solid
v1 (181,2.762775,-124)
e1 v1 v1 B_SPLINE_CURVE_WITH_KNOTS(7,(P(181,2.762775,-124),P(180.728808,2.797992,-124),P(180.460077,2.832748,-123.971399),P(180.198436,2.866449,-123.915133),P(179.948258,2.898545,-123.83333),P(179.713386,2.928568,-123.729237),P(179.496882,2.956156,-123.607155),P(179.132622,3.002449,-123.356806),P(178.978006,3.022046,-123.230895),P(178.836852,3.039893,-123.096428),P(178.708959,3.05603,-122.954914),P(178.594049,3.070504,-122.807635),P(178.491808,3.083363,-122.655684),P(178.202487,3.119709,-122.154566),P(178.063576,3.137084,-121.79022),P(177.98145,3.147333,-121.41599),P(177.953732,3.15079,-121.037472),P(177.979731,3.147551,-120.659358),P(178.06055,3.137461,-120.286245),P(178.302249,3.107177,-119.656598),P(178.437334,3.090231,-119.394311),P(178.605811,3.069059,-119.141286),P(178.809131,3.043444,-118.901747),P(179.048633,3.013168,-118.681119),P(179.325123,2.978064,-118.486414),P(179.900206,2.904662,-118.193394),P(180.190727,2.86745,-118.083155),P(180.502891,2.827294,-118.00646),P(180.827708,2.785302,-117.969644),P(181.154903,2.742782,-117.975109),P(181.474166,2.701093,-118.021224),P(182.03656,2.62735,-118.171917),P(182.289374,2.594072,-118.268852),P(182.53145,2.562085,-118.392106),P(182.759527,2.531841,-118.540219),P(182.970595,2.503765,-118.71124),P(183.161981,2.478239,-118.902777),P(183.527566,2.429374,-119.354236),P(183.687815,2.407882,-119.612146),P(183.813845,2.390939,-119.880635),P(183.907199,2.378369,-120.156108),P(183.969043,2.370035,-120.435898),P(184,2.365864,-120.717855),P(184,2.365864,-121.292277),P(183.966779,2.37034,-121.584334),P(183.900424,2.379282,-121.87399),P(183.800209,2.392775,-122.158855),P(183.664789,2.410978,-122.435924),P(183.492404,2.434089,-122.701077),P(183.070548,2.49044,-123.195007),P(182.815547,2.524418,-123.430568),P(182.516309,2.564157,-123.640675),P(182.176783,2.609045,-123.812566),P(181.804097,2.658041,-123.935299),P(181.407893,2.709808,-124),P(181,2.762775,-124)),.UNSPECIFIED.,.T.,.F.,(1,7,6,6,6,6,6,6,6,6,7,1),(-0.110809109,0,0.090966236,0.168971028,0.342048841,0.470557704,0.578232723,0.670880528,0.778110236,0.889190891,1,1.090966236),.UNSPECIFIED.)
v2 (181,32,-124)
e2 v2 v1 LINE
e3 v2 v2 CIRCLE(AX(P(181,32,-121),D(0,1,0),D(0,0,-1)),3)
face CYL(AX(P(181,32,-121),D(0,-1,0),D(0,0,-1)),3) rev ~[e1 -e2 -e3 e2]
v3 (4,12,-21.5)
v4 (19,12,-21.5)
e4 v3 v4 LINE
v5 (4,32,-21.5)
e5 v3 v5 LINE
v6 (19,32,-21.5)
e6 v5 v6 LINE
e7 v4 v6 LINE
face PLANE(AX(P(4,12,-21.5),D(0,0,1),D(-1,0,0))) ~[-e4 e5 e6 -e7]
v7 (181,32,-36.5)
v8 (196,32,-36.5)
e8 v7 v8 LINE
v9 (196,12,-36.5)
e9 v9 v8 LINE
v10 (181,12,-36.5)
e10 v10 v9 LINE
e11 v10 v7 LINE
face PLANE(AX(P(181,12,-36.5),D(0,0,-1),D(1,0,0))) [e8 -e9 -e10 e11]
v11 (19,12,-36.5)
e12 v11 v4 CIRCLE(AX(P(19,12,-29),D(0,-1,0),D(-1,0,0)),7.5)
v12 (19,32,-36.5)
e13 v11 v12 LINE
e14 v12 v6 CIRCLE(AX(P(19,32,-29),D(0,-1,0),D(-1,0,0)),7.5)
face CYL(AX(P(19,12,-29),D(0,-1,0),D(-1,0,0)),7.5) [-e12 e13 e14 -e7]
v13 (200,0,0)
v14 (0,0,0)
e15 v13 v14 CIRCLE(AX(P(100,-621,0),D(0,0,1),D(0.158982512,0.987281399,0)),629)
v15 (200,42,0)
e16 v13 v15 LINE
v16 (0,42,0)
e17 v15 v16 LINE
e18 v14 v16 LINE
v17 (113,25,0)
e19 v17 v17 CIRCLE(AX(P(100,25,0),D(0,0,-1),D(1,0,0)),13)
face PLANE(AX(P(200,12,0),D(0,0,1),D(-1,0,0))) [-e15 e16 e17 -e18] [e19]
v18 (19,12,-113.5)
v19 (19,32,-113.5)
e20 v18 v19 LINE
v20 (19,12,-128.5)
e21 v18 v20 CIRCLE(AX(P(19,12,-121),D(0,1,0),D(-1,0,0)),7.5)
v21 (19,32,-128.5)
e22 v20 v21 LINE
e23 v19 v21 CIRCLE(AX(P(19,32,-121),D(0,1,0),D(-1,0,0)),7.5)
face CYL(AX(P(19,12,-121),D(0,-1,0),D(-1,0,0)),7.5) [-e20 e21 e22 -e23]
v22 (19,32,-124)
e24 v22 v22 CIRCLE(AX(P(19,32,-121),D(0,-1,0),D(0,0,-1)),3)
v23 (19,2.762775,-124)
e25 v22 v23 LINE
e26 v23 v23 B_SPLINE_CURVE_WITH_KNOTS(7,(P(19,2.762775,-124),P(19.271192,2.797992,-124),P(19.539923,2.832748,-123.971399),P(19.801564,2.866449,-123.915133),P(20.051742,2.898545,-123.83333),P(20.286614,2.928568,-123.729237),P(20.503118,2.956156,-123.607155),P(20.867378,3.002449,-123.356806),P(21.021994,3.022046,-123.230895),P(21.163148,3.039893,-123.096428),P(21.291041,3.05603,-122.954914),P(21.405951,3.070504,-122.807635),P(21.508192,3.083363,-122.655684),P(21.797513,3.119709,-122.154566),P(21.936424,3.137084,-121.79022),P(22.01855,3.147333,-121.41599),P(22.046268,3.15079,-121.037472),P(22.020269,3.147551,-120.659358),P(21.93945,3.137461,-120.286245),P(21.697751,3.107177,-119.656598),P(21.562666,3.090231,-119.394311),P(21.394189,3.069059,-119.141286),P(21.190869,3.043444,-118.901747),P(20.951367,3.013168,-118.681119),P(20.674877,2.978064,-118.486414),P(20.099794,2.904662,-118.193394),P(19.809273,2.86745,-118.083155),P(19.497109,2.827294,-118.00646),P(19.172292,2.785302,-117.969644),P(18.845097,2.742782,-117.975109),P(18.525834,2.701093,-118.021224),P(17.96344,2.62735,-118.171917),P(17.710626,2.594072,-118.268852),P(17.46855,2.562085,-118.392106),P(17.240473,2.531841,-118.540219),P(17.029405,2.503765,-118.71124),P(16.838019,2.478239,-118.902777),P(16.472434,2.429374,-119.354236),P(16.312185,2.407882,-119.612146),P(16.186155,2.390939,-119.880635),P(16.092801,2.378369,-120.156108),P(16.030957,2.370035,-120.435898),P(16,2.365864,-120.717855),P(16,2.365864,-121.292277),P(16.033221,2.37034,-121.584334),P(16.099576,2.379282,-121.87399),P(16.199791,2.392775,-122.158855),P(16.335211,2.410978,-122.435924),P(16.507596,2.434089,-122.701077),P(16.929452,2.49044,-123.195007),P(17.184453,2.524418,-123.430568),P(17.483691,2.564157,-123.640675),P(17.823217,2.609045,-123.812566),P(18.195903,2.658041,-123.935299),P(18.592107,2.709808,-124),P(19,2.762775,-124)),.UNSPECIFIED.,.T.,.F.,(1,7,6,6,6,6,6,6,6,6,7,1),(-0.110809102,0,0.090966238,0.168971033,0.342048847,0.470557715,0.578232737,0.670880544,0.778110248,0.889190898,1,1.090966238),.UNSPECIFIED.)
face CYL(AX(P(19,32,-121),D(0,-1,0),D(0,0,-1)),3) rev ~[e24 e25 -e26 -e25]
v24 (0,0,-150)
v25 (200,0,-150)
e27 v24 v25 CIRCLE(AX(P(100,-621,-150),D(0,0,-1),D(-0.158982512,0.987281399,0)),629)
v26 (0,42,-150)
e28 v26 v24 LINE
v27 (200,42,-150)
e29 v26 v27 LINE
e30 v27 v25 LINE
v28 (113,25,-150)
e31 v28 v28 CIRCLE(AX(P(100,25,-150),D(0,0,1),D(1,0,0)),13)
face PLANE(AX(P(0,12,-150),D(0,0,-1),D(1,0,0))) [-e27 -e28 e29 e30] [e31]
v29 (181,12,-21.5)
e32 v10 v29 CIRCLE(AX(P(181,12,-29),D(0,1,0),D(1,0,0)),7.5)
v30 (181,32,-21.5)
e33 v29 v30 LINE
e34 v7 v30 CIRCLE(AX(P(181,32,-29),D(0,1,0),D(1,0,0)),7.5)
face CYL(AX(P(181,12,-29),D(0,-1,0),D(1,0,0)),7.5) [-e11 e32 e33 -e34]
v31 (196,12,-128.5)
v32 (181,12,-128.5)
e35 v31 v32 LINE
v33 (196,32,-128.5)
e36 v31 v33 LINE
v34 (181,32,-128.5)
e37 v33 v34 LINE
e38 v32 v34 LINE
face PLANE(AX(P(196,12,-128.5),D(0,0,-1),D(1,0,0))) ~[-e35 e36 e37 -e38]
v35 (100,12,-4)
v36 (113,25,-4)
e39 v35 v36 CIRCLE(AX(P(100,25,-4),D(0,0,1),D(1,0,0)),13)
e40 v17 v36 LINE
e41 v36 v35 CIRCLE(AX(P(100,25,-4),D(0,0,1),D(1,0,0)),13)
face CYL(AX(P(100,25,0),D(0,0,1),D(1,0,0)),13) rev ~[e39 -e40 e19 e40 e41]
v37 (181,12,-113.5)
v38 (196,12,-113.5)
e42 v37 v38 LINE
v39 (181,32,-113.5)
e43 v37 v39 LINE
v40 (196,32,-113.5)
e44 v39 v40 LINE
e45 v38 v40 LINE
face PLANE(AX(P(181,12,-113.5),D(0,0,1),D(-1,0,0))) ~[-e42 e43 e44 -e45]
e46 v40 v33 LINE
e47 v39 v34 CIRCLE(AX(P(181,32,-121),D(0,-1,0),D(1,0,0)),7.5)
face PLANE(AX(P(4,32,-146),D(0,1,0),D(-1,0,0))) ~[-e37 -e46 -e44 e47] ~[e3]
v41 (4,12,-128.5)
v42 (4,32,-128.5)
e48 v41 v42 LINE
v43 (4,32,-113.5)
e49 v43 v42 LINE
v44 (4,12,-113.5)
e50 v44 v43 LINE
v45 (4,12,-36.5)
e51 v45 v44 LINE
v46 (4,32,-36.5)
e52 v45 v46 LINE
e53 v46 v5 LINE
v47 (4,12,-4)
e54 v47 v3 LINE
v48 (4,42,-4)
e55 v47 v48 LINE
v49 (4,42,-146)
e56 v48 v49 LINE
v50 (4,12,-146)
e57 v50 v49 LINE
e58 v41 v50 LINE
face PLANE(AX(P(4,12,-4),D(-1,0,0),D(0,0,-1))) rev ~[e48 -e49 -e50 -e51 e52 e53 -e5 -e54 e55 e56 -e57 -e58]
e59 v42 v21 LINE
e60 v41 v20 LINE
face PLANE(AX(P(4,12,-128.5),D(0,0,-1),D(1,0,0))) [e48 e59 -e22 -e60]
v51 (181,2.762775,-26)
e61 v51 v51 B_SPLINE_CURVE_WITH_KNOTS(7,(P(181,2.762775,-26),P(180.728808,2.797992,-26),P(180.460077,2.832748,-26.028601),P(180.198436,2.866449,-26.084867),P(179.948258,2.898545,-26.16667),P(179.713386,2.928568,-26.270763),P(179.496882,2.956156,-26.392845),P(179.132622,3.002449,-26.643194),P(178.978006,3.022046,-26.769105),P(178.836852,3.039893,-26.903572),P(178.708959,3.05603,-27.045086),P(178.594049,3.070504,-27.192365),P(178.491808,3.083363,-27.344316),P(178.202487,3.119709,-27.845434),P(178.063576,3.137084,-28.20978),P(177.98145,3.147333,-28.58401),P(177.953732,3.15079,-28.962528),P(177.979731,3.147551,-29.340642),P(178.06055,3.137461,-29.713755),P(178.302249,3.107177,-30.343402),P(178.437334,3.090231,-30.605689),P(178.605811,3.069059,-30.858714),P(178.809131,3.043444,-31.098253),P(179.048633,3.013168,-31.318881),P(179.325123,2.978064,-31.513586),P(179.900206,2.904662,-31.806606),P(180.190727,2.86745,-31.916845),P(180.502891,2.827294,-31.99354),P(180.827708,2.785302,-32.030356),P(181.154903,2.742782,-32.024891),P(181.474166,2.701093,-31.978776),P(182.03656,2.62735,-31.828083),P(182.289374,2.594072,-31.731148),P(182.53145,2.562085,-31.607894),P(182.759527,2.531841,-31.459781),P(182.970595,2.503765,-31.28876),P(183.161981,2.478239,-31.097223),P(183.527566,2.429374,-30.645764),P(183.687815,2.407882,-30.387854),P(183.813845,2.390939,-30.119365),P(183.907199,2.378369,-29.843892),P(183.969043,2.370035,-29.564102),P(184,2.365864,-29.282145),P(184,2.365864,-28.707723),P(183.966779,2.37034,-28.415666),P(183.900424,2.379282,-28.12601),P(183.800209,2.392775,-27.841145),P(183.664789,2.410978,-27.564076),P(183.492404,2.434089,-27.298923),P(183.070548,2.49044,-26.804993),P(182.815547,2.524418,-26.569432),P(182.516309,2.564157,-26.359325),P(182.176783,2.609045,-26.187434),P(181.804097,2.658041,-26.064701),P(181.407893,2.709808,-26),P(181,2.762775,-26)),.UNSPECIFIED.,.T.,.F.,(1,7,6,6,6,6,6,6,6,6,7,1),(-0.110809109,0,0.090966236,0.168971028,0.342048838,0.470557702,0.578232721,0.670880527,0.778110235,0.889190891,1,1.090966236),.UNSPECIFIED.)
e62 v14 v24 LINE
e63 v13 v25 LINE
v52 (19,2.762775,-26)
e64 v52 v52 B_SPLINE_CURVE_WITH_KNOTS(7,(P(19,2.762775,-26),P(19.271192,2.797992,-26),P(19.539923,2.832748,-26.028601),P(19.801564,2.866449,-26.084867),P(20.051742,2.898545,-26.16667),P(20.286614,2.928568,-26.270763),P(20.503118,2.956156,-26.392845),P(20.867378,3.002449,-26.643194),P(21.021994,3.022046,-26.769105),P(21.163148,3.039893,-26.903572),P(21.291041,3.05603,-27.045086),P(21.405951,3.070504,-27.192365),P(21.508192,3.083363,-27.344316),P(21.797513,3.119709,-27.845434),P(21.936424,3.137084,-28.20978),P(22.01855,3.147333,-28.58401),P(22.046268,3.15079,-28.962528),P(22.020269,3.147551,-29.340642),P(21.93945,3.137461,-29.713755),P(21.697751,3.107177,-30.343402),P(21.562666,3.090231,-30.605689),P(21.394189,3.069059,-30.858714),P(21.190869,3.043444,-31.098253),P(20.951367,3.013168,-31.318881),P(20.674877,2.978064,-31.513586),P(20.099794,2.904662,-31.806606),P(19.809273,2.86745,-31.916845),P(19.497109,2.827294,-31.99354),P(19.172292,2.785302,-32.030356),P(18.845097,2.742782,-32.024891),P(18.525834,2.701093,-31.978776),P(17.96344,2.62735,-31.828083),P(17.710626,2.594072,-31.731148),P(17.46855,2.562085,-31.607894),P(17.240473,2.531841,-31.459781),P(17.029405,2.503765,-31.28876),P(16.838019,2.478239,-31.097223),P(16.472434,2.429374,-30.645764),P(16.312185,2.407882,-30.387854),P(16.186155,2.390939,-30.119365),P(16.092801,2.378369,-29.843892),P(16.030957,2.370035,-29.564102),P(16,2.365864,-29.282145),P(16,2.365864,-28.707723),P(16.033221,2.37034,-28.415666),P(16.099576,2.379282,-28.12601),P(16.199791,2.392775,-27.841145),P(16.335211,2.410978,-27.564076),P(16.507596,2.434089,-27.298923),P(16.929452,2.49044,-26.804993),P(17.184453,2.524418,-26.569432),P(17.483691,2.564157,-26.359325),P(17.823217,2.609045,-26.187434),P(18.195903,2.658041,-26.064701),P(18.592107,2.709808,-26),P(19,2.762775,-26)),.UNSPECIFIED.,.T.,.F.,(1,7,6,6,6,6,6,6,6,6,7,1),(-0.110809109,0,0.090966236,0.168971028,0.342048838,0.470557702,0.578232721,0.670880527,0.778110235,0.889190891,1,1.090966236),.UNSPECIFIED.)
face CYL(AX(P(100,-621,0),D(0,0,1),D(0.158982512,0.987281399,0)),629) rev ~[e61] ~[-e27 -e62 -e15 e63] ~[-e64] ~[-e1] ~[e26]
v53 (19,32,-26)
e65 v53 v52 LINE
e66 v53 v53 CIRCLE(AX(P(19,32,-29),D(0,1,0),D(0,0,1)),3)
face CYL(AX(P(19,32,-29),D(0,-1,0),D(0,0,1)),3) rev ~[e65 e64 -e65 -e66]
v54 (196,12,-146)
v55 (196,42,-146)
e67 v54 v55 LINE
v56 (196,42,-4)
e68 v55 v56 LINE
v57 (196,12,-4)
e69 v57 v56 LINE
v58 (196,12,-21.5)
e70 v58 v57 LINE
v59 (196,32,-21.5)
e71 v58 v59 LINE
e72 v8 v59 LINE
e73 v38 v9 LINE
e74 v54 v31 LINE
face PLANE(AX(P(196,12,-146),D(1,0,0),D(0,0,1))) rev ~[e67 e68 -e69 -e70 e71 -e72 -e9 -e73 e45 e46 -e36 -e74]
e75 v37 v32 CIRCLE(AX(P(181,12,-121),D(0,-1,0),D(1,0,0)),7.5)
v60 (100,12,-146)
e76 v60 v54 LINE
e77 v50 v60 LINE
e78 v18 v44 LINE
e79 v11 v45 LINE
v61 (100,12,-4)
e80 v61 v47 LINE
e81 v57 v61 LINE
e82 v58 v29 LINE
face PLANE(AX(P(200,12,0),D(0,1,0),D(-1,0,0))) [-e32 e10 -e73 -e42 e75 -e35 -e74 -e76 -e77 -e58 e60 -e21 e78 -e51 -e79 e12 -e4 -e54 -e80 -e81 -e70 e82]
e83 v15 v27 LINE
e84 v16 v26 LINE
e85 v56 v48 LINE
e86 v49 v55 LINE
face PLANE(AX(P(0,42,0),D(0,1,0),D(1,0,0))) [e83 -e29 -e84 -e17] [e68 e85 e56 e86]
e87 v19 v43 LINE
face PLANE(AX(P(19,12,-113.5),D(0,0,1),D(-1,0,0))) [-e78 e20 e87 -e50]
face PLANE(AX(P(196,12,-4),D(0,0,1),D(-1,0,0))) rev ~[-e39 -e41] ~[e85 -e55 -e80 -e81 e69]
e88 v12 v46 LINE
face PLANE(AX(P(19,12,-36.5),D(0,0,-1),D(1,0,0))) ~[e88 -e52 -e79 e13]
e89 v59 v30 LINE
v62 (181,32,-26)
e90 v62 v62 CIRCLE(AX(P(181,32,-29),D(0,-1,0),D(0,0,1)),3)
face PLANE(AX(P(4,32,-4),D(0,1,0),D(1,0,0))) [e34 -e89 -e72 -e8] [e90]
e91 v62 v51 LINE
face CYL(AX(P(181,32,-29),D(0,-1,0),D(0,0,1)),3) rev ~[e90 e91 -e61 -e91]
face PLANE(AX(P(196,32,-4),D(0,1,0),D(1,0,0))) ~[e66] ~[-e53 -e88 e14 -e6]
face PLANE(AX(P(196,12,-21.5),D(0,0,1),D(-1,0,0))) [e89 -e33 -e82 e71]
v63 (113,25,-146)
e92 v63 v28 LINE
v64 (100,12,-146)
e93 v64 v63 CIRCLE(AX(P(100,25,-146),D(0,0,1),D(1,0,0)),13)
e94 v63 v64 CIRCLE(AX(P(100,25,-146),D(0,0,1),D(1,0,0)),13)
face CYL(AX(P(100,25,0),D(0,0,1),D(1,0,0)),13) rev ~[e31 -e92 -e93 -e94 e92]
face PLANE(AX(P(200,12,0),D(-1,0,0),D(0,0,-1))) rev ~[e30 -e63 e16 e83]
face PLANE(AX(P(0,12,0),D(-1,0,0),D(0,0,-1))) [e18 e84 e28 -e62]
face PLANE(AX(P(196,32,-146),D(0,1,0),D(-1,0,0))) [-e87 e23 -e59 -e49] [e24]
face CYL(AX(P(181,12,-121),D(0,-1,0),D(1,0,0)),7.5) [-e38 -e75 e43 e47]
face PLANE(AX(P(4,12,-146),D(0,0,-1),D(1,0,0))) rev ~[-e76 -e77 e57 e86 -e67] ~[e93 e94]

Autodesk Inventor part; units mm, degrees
ref_plane "YZ Plane" through (0, 0, 0) normal (1, 0, 0) x (0, 1, 0)
ref_plane "XZ Plane" through (0, 0, 0) normal (0, 1, 0) x (-1, 0, 0)
sketch "Sketch4" plane through (0, 0, 0) normal (0, 0, 1) x (1, 0, 0)
  line L0 (0, 0) -> (200, 0) construction
  line L1 (0, 0) -> (200, 0) construction
  line L2 (100, 0) -> (100, 8)
  arc A0 (200, 0) -> (0, 0) centre (100, -621) ccw
  line L3 (0, 0) -> (0, 4)
  line L4 (200, 0) -> (200, 4)
  line L5 (100, 8) -> (100, 12)
  arc A1 (200, 4) -> (0, 4) centre (100, -617) ccw
  dimension "d11" = 200
  dimension "d13" = 8
  dimension "d14" = 4
  dimension "d15" = 4
extrude "Extrusion5" add sketch "Sketch4" against normal blind 150
sketch "Sketch5" plane through (0, 0, 0) normal (0, 0, 1) x (1, 0, 0)
  arc A0 (200, 4) -> (0, 4) centre (100, -617) ccw projected
  line L0 (100, 12) -> (100, 8)
  arc A1 (200, 0) -> (0, 0) centre (100, -621) ccw projected
  line L1 (0, 4) -> (200, 4)
  line L2 (200, 4) -> (200, 12)
  line L3 (200, 12) -> (0, 12)
  line L4 (0, 12) -> (0, 4)
  point P0 (200, 4)
extrude "Extrusion6" add sketch "Sketch5" against normal up to surface (150 mm away) contours A0 L3 L2 | A0 L4 L3
sketch "Sketch6" plane through (0, 12, 0) normal (0, 1, 0) x (1, 0, 0)
  line L0 (0, 0) -> (0, 150) projected
  line L1 (200, 0) -> (200, 150) projected
  line L2 (0, 150) -> (200, 150)
  line L3 (200, 150) -> (200, 0)
  line L4 (200, 0) -> (0, 0)
  line L5 (0, 0) -> (0, 150)
  line L6 (196, 4) -> (4, 4)
  line L7 (4, 4) -> (4, 146)
  line L8 (4, 146) -> (196, 146)
  line L9 (196, 146) -> (196, 4)
  dimension "d22" = 192
  dimension "d23" = 142
extrude "Extrusion7" add sketch "Sketch6" along normal blind 30
sketch "Sketch7" plane through (0, 0, 0) normal (0, 0, 1) x (1, 0, 0)
  line L0 (196, 12) -> (4, 12) projected
  line L1 (100, 12) -> (100, 25) construction
  circle A0 centre (100, 25) radius 13
  point P0 (0, 0)
  dimension "d26" = 13
  dimension "d27" = 26
extrude "Extrusion8" cut sketch "Sketch7" against normal up to surface (150 mm away)
sketch "Sketch8" plane through (4, 12, -4) normal (0, 1, 0) x (1, 0, 0)
  line L0 (192, 0) -> (192, 142) projected
  line L1 (192, 0) -> (192, 25)
  line L2 (96, 142) -> (0, 142) projected
  line L3 (0, 142) -> (0, 0) projected
  line L4 (192, 25) -> (177, 25)
  circle A0 centre (177, 25) radius 7.5
  line L5 (177, 32.5) -> (192, 32.5)
  line L6 (192, 32.5) -> (192, 17.5)
  line L7 (192, 17.5) -> (177, 17.5)
  line L8 (177, 17.5) -> (177, 32.5)
  line L9 (192, 0) -> (96, 0) construction
  line L10 (96, 0) -> (96, 71) construction
  line L11 (96, 71) -> (192, 71) construction
  line L12 (192, 71) -> (192, 0) construction
  point P0 (-4, -4)
  point P1 (177, 17.5)
  dimension "d33" = 15
  dimension "d30" = 25
  dimension "d32" = 15
extrude "Extrusion9" add sketch "Sketch8" along normal blind 20
sketch "Sketch9" plane through (4, 32, -4) normal (0, 1, 0) x (1, 0, 0)
  line L0 (192, 17.5) -> (177, 17.5) projected
  arc A0 (177, 32.5) -> (177, 17.5) centre (177, 25) ccw projected
  line L1 (177, 17.5) -> (177, 32.5)
  point P0 (-4, -4)
hole "Hole1" at (181, 32, -29) direction (0, -1, 0) diameter 6 end through all
pattern_circular "Circular Pattern1" count 2 over 360 about axis through (100, 2.6712, -75) along (0, 1, 0) of "Hole1", "Extrusion9"
ref_plane "Work Plane1" through (196, 42, -75) normal (0, 0, -1) x (-1, 0, 0)
mirror "Mirror1" about plane through (196, 42, -75) normal (0, 0, -1) of "Hole1", "Extrusion9", "Circular Pattern1"
properties part number "McCase"
